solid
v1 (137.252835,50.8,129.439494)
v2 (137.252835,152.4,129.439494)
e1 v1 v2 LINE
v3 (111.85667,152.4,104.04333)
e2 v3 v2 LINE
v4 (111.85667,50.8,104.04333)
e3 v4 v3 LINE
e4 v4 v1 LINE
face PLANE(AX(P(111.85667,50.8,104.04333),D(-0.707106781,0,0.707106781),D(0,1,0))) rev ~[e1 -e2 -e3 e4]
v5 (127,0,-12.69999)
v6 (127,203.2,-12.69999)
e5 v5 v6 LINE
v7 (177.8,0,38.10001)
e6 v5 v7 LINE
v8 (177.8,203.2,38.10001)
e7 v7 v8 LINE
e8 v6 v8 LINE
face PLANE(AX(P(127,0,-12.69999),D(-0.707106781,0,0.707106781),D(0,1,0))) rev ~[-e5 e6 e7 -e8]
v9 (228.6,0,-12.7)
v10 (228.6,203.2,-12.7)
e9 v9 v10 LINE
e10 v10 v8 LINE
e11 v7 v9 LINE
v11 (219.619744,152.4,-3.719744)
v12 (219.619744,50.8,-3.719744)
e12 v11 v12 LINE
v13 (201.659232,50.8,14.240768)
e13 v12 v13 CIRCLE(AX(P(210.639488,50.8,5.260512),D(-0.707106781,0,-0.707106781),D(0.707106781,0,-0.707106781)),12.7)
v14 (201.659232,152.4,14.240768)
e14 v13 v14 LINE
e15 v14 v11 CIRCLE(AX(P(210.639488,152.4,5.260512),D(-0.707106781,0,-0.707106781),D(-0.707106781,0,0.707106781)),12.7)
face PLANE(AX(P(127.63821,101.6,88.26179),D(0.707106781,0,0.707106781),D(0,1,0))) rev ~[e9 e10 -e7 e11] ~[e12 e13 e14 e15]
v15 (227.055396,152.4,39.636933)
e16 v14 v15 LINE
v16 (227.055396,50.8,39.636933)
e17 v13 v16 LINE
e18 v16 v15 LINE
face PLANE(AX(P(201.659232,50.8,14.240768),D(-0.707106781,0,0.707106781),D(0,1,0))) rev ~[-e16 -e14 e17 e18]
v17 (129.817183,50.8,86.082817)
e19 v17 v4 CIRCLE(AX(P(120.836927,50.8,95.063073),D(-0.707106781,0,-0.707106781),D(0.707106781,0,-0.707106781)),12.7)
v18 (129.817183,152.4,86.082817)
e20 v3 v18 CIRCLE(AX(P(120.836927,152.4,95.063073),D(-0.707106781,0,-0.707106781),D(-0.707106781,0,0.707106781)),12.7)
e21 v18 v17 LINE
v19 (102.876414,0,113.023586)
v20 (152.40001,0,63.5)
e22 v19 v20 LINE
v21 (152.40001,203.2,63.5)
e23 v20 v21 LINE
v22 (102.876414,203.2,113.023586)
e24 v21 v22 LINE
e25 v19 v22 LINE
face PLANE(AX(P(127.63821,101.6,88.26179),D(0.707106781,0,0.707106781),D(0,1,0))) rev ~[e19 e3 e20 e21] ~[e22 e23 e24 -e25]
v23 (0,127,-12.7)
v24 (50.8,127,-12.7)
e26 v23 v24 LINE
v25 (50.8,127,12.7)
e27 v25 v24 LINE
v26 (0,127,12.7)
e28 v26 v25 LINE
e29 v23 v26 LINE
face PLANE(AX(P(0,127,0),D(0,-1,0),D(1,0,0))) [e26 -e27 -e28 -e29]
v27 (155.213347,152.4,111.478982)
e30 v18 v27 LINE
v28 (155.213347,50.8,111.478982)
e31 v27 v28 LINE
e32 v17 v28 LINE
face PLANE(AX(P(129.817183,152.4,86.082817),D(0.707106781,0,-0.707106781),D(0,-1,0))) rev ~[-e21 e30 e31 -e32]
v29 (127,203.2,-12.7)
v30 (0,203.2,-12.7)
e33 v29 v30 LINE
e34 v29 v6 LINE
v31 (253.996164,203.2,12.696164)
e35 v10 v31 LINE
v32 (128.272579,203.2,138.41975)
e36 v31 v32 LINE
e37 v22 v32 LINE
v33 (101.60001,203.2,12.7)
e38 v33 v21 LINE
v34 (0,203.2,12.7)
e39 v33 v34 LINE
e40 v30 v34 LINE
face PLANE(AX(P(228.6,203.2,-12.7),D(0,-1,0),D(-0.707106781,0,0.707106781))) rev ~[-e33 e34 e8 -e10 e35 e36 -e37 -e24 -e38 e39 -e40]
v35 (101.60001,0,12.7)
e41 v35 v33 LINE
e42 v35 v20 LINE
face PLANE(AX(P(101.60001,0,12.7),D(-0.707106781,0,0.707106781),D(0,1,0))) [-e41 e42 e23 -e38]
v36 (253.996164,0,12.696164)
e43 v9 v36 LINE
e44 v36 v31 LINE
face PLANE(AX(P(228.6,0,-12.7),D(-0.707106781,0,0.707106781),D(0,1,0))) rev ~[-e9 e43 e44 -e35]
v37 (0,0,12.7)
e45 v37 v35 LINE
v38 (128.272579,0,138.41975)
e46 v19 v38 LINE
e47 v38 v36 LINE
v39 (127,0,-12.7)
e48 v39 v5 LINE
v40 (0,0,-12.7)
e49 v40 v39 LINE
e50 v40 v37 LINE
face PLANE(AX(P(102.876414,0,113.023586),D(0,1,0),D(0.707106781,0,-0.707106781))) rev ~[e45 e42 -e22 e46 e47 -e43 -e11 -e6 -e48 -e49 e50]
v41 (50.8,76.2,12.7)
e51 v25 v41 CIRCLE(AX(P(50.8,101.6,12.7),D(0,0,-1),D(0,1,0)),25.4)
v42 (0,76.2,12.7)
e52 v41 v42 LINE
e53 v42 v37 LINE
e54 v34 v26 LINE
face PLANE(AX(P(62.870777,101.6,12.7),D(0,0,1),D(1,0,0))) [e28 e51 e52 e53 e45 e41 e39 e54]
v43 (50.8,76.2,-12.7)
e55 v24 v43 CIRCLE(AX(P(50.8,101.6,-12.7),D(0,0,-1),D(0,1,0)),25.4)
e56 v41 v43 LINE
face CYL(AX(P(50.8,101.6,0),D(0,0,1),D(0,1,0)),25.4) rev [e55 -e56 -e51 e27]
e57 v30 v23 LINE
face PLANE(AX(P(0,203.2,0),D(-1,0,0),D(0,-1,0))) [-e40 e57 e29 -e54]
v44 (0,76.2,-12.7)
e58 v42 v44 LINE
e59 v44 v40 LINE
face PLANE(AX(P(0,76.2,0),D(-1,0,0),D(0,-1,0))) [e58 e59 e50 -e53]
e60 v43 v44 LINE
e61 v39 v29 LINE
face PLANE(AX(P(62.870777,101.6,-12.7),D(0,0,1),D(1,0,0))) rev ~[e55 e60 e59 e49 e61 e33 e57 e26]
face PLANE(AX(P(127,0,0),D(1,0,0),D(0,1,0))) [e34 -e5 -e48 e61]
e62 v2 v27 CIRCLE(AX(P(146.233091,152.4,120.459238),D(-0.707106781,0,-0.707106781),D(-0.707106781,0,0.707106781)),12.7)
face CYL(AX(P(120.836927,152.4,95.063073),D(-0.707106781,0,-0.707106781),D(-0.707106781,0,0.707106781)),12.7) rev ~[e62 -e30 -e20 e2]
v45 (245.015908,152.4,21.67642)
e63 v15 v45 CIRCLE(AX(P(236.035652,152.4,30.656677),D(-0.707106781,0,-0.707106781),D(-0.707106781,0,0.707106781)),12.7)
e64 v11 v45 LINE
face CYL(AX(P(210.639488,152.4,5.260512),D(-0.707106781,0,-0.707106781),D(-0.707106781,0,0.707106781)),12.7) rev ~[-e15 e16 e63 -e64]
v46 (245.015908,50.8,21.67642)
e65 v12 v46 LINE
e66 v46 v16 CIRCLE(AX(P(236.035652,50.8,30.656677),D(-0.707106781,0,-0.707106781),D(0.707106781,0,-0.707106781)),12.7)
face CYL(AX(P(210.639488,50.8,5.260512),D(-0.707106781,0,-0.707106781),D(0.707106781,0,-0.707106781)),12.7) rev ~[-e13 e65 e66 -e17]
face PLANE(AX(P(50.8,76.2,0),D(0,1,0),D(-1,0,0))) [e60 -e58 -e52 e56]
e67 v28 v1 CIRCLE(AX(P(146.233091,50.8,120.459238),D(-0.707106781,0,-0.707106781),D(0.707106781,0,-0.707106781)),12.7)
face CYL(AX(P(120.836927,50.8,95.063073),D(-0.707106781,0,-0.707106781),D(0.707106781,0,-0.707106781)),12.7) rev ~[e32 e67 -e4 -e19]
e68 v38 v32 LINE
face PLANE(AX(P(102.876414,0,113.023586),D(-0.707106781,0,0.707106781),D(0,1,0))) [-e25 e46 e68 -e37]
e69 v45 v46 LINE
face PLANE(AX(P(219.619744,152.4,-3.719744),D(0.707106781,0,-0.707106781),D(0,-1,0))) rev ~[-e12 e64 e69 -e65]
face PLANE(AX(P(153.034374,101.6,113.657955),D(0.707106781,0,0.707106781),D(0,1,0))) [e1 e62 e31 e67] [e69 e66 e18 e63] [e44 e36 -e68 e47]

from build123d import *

# Parameters (mm, degrees)
F1_DEPTH = 12.7
F2_SIZE  = 25.39999
F3_DEPTH = 71.8420489686
F4_W     = 203.2
F4_H     = 70.0369336182
F4_H_2   = 71.8420560396
F4_H_3   = 35.9210103421
F5_DEPTH = 35.9156


# Not quite as in the source:
# - a fillet or chamfer is up to 0.001 mm smaller than in the source, because OpenCascade refuses the exact size


with BuildPart() as f1:
    # F0 (on Top) → F1 (new body, symmetric)
    with BuildSketch(Plane.XY):
        with BuildLine():
            Line((0, 76.2), (0, 0))
            Line((0, 0), (127, 0))
            Line((127, 0), (127, 203.2))
            Line((127, 203.2), (0, 203.2))
            Line((0, 203.2), (0, 127))
            Line((0, 127), (50.8, 127))
            ThreePointArc((50.8, 127), (76.2, 101.6), (50.8, 76.2))
            Line((50.8, 76.2), (0, 76.2))
        make_face()
    extrude(amount=F1_DEPTH, both=True)

    # F2 (size 25.4 in the source; OpenCascade refuses exactly that, so slightly less here)
    f2_edges = [f1.edges().sort_by_distance(p)[0] for p in [
        (127, 101.6, 12.7),
    ]]
    chamfer(f2_edges, length=F2_SIZE)

    # F3 (add): a face of the model
    f3_faces = [f1.faces().sort_by_distance(p)[0] for p in [
        (114.300005, 101.6, 5e-06),
    ]]
    extrude(f3_faces, amount=F3_DEPTH)

    # F4 (on face) → F5 (join)
    with BuildSketch(Plane(origin=(107.95, 0, 107.95), x_dir=(0, 1, 0), z_dir=(0.7071067812, 0, 0.7071067812))):
        with Locations((101.6, -27.8433331094)):
            Rectangle(F4_W, F4_H)
        with BuildLine():
            ThreePointArc((50.8, -30.9248663003), (38.1, -18.2248663003), (50.8, -5.5248663003))
            Line((50.8, -5.5248663003), (152.4, -5.5248663003))
            ThreePointArc((152.4, -5.5248663003), (165.1, -18.2248663003), (152.4, -30.9248663003))
            Line((152.4, -30.9248663003), (50.8, -30.9248663003))
        make_face(mode=Mode.SUBTRACT)
        with Locations((101.6, -134.7038382805)):
            Rectangle(F4_W, F4_H_2)
        with BuildLine():
            ThreePointArc((50.8, -157.9248663003), (38.1, -145.2248663003), (50.8, -132.5248663003))
            Line((50.8, -132.5248663003), (152.4, -132.5248663003))
            ThreePointArc((152.4, -132.5248663003), (165.1, -145.2248663003), (152.4, -157.9248663003))
            Line((152.4, -157.9248663003), (50.8, -157.9248663003))
        make_face(mode=Mode.SUBTRACT)
        with Locations((101.6, -80.8223050896)):
            Rectangle(F4_W, F4_H_3)
    extrude(amount=F5_DEPTH)


solid = f1.part
